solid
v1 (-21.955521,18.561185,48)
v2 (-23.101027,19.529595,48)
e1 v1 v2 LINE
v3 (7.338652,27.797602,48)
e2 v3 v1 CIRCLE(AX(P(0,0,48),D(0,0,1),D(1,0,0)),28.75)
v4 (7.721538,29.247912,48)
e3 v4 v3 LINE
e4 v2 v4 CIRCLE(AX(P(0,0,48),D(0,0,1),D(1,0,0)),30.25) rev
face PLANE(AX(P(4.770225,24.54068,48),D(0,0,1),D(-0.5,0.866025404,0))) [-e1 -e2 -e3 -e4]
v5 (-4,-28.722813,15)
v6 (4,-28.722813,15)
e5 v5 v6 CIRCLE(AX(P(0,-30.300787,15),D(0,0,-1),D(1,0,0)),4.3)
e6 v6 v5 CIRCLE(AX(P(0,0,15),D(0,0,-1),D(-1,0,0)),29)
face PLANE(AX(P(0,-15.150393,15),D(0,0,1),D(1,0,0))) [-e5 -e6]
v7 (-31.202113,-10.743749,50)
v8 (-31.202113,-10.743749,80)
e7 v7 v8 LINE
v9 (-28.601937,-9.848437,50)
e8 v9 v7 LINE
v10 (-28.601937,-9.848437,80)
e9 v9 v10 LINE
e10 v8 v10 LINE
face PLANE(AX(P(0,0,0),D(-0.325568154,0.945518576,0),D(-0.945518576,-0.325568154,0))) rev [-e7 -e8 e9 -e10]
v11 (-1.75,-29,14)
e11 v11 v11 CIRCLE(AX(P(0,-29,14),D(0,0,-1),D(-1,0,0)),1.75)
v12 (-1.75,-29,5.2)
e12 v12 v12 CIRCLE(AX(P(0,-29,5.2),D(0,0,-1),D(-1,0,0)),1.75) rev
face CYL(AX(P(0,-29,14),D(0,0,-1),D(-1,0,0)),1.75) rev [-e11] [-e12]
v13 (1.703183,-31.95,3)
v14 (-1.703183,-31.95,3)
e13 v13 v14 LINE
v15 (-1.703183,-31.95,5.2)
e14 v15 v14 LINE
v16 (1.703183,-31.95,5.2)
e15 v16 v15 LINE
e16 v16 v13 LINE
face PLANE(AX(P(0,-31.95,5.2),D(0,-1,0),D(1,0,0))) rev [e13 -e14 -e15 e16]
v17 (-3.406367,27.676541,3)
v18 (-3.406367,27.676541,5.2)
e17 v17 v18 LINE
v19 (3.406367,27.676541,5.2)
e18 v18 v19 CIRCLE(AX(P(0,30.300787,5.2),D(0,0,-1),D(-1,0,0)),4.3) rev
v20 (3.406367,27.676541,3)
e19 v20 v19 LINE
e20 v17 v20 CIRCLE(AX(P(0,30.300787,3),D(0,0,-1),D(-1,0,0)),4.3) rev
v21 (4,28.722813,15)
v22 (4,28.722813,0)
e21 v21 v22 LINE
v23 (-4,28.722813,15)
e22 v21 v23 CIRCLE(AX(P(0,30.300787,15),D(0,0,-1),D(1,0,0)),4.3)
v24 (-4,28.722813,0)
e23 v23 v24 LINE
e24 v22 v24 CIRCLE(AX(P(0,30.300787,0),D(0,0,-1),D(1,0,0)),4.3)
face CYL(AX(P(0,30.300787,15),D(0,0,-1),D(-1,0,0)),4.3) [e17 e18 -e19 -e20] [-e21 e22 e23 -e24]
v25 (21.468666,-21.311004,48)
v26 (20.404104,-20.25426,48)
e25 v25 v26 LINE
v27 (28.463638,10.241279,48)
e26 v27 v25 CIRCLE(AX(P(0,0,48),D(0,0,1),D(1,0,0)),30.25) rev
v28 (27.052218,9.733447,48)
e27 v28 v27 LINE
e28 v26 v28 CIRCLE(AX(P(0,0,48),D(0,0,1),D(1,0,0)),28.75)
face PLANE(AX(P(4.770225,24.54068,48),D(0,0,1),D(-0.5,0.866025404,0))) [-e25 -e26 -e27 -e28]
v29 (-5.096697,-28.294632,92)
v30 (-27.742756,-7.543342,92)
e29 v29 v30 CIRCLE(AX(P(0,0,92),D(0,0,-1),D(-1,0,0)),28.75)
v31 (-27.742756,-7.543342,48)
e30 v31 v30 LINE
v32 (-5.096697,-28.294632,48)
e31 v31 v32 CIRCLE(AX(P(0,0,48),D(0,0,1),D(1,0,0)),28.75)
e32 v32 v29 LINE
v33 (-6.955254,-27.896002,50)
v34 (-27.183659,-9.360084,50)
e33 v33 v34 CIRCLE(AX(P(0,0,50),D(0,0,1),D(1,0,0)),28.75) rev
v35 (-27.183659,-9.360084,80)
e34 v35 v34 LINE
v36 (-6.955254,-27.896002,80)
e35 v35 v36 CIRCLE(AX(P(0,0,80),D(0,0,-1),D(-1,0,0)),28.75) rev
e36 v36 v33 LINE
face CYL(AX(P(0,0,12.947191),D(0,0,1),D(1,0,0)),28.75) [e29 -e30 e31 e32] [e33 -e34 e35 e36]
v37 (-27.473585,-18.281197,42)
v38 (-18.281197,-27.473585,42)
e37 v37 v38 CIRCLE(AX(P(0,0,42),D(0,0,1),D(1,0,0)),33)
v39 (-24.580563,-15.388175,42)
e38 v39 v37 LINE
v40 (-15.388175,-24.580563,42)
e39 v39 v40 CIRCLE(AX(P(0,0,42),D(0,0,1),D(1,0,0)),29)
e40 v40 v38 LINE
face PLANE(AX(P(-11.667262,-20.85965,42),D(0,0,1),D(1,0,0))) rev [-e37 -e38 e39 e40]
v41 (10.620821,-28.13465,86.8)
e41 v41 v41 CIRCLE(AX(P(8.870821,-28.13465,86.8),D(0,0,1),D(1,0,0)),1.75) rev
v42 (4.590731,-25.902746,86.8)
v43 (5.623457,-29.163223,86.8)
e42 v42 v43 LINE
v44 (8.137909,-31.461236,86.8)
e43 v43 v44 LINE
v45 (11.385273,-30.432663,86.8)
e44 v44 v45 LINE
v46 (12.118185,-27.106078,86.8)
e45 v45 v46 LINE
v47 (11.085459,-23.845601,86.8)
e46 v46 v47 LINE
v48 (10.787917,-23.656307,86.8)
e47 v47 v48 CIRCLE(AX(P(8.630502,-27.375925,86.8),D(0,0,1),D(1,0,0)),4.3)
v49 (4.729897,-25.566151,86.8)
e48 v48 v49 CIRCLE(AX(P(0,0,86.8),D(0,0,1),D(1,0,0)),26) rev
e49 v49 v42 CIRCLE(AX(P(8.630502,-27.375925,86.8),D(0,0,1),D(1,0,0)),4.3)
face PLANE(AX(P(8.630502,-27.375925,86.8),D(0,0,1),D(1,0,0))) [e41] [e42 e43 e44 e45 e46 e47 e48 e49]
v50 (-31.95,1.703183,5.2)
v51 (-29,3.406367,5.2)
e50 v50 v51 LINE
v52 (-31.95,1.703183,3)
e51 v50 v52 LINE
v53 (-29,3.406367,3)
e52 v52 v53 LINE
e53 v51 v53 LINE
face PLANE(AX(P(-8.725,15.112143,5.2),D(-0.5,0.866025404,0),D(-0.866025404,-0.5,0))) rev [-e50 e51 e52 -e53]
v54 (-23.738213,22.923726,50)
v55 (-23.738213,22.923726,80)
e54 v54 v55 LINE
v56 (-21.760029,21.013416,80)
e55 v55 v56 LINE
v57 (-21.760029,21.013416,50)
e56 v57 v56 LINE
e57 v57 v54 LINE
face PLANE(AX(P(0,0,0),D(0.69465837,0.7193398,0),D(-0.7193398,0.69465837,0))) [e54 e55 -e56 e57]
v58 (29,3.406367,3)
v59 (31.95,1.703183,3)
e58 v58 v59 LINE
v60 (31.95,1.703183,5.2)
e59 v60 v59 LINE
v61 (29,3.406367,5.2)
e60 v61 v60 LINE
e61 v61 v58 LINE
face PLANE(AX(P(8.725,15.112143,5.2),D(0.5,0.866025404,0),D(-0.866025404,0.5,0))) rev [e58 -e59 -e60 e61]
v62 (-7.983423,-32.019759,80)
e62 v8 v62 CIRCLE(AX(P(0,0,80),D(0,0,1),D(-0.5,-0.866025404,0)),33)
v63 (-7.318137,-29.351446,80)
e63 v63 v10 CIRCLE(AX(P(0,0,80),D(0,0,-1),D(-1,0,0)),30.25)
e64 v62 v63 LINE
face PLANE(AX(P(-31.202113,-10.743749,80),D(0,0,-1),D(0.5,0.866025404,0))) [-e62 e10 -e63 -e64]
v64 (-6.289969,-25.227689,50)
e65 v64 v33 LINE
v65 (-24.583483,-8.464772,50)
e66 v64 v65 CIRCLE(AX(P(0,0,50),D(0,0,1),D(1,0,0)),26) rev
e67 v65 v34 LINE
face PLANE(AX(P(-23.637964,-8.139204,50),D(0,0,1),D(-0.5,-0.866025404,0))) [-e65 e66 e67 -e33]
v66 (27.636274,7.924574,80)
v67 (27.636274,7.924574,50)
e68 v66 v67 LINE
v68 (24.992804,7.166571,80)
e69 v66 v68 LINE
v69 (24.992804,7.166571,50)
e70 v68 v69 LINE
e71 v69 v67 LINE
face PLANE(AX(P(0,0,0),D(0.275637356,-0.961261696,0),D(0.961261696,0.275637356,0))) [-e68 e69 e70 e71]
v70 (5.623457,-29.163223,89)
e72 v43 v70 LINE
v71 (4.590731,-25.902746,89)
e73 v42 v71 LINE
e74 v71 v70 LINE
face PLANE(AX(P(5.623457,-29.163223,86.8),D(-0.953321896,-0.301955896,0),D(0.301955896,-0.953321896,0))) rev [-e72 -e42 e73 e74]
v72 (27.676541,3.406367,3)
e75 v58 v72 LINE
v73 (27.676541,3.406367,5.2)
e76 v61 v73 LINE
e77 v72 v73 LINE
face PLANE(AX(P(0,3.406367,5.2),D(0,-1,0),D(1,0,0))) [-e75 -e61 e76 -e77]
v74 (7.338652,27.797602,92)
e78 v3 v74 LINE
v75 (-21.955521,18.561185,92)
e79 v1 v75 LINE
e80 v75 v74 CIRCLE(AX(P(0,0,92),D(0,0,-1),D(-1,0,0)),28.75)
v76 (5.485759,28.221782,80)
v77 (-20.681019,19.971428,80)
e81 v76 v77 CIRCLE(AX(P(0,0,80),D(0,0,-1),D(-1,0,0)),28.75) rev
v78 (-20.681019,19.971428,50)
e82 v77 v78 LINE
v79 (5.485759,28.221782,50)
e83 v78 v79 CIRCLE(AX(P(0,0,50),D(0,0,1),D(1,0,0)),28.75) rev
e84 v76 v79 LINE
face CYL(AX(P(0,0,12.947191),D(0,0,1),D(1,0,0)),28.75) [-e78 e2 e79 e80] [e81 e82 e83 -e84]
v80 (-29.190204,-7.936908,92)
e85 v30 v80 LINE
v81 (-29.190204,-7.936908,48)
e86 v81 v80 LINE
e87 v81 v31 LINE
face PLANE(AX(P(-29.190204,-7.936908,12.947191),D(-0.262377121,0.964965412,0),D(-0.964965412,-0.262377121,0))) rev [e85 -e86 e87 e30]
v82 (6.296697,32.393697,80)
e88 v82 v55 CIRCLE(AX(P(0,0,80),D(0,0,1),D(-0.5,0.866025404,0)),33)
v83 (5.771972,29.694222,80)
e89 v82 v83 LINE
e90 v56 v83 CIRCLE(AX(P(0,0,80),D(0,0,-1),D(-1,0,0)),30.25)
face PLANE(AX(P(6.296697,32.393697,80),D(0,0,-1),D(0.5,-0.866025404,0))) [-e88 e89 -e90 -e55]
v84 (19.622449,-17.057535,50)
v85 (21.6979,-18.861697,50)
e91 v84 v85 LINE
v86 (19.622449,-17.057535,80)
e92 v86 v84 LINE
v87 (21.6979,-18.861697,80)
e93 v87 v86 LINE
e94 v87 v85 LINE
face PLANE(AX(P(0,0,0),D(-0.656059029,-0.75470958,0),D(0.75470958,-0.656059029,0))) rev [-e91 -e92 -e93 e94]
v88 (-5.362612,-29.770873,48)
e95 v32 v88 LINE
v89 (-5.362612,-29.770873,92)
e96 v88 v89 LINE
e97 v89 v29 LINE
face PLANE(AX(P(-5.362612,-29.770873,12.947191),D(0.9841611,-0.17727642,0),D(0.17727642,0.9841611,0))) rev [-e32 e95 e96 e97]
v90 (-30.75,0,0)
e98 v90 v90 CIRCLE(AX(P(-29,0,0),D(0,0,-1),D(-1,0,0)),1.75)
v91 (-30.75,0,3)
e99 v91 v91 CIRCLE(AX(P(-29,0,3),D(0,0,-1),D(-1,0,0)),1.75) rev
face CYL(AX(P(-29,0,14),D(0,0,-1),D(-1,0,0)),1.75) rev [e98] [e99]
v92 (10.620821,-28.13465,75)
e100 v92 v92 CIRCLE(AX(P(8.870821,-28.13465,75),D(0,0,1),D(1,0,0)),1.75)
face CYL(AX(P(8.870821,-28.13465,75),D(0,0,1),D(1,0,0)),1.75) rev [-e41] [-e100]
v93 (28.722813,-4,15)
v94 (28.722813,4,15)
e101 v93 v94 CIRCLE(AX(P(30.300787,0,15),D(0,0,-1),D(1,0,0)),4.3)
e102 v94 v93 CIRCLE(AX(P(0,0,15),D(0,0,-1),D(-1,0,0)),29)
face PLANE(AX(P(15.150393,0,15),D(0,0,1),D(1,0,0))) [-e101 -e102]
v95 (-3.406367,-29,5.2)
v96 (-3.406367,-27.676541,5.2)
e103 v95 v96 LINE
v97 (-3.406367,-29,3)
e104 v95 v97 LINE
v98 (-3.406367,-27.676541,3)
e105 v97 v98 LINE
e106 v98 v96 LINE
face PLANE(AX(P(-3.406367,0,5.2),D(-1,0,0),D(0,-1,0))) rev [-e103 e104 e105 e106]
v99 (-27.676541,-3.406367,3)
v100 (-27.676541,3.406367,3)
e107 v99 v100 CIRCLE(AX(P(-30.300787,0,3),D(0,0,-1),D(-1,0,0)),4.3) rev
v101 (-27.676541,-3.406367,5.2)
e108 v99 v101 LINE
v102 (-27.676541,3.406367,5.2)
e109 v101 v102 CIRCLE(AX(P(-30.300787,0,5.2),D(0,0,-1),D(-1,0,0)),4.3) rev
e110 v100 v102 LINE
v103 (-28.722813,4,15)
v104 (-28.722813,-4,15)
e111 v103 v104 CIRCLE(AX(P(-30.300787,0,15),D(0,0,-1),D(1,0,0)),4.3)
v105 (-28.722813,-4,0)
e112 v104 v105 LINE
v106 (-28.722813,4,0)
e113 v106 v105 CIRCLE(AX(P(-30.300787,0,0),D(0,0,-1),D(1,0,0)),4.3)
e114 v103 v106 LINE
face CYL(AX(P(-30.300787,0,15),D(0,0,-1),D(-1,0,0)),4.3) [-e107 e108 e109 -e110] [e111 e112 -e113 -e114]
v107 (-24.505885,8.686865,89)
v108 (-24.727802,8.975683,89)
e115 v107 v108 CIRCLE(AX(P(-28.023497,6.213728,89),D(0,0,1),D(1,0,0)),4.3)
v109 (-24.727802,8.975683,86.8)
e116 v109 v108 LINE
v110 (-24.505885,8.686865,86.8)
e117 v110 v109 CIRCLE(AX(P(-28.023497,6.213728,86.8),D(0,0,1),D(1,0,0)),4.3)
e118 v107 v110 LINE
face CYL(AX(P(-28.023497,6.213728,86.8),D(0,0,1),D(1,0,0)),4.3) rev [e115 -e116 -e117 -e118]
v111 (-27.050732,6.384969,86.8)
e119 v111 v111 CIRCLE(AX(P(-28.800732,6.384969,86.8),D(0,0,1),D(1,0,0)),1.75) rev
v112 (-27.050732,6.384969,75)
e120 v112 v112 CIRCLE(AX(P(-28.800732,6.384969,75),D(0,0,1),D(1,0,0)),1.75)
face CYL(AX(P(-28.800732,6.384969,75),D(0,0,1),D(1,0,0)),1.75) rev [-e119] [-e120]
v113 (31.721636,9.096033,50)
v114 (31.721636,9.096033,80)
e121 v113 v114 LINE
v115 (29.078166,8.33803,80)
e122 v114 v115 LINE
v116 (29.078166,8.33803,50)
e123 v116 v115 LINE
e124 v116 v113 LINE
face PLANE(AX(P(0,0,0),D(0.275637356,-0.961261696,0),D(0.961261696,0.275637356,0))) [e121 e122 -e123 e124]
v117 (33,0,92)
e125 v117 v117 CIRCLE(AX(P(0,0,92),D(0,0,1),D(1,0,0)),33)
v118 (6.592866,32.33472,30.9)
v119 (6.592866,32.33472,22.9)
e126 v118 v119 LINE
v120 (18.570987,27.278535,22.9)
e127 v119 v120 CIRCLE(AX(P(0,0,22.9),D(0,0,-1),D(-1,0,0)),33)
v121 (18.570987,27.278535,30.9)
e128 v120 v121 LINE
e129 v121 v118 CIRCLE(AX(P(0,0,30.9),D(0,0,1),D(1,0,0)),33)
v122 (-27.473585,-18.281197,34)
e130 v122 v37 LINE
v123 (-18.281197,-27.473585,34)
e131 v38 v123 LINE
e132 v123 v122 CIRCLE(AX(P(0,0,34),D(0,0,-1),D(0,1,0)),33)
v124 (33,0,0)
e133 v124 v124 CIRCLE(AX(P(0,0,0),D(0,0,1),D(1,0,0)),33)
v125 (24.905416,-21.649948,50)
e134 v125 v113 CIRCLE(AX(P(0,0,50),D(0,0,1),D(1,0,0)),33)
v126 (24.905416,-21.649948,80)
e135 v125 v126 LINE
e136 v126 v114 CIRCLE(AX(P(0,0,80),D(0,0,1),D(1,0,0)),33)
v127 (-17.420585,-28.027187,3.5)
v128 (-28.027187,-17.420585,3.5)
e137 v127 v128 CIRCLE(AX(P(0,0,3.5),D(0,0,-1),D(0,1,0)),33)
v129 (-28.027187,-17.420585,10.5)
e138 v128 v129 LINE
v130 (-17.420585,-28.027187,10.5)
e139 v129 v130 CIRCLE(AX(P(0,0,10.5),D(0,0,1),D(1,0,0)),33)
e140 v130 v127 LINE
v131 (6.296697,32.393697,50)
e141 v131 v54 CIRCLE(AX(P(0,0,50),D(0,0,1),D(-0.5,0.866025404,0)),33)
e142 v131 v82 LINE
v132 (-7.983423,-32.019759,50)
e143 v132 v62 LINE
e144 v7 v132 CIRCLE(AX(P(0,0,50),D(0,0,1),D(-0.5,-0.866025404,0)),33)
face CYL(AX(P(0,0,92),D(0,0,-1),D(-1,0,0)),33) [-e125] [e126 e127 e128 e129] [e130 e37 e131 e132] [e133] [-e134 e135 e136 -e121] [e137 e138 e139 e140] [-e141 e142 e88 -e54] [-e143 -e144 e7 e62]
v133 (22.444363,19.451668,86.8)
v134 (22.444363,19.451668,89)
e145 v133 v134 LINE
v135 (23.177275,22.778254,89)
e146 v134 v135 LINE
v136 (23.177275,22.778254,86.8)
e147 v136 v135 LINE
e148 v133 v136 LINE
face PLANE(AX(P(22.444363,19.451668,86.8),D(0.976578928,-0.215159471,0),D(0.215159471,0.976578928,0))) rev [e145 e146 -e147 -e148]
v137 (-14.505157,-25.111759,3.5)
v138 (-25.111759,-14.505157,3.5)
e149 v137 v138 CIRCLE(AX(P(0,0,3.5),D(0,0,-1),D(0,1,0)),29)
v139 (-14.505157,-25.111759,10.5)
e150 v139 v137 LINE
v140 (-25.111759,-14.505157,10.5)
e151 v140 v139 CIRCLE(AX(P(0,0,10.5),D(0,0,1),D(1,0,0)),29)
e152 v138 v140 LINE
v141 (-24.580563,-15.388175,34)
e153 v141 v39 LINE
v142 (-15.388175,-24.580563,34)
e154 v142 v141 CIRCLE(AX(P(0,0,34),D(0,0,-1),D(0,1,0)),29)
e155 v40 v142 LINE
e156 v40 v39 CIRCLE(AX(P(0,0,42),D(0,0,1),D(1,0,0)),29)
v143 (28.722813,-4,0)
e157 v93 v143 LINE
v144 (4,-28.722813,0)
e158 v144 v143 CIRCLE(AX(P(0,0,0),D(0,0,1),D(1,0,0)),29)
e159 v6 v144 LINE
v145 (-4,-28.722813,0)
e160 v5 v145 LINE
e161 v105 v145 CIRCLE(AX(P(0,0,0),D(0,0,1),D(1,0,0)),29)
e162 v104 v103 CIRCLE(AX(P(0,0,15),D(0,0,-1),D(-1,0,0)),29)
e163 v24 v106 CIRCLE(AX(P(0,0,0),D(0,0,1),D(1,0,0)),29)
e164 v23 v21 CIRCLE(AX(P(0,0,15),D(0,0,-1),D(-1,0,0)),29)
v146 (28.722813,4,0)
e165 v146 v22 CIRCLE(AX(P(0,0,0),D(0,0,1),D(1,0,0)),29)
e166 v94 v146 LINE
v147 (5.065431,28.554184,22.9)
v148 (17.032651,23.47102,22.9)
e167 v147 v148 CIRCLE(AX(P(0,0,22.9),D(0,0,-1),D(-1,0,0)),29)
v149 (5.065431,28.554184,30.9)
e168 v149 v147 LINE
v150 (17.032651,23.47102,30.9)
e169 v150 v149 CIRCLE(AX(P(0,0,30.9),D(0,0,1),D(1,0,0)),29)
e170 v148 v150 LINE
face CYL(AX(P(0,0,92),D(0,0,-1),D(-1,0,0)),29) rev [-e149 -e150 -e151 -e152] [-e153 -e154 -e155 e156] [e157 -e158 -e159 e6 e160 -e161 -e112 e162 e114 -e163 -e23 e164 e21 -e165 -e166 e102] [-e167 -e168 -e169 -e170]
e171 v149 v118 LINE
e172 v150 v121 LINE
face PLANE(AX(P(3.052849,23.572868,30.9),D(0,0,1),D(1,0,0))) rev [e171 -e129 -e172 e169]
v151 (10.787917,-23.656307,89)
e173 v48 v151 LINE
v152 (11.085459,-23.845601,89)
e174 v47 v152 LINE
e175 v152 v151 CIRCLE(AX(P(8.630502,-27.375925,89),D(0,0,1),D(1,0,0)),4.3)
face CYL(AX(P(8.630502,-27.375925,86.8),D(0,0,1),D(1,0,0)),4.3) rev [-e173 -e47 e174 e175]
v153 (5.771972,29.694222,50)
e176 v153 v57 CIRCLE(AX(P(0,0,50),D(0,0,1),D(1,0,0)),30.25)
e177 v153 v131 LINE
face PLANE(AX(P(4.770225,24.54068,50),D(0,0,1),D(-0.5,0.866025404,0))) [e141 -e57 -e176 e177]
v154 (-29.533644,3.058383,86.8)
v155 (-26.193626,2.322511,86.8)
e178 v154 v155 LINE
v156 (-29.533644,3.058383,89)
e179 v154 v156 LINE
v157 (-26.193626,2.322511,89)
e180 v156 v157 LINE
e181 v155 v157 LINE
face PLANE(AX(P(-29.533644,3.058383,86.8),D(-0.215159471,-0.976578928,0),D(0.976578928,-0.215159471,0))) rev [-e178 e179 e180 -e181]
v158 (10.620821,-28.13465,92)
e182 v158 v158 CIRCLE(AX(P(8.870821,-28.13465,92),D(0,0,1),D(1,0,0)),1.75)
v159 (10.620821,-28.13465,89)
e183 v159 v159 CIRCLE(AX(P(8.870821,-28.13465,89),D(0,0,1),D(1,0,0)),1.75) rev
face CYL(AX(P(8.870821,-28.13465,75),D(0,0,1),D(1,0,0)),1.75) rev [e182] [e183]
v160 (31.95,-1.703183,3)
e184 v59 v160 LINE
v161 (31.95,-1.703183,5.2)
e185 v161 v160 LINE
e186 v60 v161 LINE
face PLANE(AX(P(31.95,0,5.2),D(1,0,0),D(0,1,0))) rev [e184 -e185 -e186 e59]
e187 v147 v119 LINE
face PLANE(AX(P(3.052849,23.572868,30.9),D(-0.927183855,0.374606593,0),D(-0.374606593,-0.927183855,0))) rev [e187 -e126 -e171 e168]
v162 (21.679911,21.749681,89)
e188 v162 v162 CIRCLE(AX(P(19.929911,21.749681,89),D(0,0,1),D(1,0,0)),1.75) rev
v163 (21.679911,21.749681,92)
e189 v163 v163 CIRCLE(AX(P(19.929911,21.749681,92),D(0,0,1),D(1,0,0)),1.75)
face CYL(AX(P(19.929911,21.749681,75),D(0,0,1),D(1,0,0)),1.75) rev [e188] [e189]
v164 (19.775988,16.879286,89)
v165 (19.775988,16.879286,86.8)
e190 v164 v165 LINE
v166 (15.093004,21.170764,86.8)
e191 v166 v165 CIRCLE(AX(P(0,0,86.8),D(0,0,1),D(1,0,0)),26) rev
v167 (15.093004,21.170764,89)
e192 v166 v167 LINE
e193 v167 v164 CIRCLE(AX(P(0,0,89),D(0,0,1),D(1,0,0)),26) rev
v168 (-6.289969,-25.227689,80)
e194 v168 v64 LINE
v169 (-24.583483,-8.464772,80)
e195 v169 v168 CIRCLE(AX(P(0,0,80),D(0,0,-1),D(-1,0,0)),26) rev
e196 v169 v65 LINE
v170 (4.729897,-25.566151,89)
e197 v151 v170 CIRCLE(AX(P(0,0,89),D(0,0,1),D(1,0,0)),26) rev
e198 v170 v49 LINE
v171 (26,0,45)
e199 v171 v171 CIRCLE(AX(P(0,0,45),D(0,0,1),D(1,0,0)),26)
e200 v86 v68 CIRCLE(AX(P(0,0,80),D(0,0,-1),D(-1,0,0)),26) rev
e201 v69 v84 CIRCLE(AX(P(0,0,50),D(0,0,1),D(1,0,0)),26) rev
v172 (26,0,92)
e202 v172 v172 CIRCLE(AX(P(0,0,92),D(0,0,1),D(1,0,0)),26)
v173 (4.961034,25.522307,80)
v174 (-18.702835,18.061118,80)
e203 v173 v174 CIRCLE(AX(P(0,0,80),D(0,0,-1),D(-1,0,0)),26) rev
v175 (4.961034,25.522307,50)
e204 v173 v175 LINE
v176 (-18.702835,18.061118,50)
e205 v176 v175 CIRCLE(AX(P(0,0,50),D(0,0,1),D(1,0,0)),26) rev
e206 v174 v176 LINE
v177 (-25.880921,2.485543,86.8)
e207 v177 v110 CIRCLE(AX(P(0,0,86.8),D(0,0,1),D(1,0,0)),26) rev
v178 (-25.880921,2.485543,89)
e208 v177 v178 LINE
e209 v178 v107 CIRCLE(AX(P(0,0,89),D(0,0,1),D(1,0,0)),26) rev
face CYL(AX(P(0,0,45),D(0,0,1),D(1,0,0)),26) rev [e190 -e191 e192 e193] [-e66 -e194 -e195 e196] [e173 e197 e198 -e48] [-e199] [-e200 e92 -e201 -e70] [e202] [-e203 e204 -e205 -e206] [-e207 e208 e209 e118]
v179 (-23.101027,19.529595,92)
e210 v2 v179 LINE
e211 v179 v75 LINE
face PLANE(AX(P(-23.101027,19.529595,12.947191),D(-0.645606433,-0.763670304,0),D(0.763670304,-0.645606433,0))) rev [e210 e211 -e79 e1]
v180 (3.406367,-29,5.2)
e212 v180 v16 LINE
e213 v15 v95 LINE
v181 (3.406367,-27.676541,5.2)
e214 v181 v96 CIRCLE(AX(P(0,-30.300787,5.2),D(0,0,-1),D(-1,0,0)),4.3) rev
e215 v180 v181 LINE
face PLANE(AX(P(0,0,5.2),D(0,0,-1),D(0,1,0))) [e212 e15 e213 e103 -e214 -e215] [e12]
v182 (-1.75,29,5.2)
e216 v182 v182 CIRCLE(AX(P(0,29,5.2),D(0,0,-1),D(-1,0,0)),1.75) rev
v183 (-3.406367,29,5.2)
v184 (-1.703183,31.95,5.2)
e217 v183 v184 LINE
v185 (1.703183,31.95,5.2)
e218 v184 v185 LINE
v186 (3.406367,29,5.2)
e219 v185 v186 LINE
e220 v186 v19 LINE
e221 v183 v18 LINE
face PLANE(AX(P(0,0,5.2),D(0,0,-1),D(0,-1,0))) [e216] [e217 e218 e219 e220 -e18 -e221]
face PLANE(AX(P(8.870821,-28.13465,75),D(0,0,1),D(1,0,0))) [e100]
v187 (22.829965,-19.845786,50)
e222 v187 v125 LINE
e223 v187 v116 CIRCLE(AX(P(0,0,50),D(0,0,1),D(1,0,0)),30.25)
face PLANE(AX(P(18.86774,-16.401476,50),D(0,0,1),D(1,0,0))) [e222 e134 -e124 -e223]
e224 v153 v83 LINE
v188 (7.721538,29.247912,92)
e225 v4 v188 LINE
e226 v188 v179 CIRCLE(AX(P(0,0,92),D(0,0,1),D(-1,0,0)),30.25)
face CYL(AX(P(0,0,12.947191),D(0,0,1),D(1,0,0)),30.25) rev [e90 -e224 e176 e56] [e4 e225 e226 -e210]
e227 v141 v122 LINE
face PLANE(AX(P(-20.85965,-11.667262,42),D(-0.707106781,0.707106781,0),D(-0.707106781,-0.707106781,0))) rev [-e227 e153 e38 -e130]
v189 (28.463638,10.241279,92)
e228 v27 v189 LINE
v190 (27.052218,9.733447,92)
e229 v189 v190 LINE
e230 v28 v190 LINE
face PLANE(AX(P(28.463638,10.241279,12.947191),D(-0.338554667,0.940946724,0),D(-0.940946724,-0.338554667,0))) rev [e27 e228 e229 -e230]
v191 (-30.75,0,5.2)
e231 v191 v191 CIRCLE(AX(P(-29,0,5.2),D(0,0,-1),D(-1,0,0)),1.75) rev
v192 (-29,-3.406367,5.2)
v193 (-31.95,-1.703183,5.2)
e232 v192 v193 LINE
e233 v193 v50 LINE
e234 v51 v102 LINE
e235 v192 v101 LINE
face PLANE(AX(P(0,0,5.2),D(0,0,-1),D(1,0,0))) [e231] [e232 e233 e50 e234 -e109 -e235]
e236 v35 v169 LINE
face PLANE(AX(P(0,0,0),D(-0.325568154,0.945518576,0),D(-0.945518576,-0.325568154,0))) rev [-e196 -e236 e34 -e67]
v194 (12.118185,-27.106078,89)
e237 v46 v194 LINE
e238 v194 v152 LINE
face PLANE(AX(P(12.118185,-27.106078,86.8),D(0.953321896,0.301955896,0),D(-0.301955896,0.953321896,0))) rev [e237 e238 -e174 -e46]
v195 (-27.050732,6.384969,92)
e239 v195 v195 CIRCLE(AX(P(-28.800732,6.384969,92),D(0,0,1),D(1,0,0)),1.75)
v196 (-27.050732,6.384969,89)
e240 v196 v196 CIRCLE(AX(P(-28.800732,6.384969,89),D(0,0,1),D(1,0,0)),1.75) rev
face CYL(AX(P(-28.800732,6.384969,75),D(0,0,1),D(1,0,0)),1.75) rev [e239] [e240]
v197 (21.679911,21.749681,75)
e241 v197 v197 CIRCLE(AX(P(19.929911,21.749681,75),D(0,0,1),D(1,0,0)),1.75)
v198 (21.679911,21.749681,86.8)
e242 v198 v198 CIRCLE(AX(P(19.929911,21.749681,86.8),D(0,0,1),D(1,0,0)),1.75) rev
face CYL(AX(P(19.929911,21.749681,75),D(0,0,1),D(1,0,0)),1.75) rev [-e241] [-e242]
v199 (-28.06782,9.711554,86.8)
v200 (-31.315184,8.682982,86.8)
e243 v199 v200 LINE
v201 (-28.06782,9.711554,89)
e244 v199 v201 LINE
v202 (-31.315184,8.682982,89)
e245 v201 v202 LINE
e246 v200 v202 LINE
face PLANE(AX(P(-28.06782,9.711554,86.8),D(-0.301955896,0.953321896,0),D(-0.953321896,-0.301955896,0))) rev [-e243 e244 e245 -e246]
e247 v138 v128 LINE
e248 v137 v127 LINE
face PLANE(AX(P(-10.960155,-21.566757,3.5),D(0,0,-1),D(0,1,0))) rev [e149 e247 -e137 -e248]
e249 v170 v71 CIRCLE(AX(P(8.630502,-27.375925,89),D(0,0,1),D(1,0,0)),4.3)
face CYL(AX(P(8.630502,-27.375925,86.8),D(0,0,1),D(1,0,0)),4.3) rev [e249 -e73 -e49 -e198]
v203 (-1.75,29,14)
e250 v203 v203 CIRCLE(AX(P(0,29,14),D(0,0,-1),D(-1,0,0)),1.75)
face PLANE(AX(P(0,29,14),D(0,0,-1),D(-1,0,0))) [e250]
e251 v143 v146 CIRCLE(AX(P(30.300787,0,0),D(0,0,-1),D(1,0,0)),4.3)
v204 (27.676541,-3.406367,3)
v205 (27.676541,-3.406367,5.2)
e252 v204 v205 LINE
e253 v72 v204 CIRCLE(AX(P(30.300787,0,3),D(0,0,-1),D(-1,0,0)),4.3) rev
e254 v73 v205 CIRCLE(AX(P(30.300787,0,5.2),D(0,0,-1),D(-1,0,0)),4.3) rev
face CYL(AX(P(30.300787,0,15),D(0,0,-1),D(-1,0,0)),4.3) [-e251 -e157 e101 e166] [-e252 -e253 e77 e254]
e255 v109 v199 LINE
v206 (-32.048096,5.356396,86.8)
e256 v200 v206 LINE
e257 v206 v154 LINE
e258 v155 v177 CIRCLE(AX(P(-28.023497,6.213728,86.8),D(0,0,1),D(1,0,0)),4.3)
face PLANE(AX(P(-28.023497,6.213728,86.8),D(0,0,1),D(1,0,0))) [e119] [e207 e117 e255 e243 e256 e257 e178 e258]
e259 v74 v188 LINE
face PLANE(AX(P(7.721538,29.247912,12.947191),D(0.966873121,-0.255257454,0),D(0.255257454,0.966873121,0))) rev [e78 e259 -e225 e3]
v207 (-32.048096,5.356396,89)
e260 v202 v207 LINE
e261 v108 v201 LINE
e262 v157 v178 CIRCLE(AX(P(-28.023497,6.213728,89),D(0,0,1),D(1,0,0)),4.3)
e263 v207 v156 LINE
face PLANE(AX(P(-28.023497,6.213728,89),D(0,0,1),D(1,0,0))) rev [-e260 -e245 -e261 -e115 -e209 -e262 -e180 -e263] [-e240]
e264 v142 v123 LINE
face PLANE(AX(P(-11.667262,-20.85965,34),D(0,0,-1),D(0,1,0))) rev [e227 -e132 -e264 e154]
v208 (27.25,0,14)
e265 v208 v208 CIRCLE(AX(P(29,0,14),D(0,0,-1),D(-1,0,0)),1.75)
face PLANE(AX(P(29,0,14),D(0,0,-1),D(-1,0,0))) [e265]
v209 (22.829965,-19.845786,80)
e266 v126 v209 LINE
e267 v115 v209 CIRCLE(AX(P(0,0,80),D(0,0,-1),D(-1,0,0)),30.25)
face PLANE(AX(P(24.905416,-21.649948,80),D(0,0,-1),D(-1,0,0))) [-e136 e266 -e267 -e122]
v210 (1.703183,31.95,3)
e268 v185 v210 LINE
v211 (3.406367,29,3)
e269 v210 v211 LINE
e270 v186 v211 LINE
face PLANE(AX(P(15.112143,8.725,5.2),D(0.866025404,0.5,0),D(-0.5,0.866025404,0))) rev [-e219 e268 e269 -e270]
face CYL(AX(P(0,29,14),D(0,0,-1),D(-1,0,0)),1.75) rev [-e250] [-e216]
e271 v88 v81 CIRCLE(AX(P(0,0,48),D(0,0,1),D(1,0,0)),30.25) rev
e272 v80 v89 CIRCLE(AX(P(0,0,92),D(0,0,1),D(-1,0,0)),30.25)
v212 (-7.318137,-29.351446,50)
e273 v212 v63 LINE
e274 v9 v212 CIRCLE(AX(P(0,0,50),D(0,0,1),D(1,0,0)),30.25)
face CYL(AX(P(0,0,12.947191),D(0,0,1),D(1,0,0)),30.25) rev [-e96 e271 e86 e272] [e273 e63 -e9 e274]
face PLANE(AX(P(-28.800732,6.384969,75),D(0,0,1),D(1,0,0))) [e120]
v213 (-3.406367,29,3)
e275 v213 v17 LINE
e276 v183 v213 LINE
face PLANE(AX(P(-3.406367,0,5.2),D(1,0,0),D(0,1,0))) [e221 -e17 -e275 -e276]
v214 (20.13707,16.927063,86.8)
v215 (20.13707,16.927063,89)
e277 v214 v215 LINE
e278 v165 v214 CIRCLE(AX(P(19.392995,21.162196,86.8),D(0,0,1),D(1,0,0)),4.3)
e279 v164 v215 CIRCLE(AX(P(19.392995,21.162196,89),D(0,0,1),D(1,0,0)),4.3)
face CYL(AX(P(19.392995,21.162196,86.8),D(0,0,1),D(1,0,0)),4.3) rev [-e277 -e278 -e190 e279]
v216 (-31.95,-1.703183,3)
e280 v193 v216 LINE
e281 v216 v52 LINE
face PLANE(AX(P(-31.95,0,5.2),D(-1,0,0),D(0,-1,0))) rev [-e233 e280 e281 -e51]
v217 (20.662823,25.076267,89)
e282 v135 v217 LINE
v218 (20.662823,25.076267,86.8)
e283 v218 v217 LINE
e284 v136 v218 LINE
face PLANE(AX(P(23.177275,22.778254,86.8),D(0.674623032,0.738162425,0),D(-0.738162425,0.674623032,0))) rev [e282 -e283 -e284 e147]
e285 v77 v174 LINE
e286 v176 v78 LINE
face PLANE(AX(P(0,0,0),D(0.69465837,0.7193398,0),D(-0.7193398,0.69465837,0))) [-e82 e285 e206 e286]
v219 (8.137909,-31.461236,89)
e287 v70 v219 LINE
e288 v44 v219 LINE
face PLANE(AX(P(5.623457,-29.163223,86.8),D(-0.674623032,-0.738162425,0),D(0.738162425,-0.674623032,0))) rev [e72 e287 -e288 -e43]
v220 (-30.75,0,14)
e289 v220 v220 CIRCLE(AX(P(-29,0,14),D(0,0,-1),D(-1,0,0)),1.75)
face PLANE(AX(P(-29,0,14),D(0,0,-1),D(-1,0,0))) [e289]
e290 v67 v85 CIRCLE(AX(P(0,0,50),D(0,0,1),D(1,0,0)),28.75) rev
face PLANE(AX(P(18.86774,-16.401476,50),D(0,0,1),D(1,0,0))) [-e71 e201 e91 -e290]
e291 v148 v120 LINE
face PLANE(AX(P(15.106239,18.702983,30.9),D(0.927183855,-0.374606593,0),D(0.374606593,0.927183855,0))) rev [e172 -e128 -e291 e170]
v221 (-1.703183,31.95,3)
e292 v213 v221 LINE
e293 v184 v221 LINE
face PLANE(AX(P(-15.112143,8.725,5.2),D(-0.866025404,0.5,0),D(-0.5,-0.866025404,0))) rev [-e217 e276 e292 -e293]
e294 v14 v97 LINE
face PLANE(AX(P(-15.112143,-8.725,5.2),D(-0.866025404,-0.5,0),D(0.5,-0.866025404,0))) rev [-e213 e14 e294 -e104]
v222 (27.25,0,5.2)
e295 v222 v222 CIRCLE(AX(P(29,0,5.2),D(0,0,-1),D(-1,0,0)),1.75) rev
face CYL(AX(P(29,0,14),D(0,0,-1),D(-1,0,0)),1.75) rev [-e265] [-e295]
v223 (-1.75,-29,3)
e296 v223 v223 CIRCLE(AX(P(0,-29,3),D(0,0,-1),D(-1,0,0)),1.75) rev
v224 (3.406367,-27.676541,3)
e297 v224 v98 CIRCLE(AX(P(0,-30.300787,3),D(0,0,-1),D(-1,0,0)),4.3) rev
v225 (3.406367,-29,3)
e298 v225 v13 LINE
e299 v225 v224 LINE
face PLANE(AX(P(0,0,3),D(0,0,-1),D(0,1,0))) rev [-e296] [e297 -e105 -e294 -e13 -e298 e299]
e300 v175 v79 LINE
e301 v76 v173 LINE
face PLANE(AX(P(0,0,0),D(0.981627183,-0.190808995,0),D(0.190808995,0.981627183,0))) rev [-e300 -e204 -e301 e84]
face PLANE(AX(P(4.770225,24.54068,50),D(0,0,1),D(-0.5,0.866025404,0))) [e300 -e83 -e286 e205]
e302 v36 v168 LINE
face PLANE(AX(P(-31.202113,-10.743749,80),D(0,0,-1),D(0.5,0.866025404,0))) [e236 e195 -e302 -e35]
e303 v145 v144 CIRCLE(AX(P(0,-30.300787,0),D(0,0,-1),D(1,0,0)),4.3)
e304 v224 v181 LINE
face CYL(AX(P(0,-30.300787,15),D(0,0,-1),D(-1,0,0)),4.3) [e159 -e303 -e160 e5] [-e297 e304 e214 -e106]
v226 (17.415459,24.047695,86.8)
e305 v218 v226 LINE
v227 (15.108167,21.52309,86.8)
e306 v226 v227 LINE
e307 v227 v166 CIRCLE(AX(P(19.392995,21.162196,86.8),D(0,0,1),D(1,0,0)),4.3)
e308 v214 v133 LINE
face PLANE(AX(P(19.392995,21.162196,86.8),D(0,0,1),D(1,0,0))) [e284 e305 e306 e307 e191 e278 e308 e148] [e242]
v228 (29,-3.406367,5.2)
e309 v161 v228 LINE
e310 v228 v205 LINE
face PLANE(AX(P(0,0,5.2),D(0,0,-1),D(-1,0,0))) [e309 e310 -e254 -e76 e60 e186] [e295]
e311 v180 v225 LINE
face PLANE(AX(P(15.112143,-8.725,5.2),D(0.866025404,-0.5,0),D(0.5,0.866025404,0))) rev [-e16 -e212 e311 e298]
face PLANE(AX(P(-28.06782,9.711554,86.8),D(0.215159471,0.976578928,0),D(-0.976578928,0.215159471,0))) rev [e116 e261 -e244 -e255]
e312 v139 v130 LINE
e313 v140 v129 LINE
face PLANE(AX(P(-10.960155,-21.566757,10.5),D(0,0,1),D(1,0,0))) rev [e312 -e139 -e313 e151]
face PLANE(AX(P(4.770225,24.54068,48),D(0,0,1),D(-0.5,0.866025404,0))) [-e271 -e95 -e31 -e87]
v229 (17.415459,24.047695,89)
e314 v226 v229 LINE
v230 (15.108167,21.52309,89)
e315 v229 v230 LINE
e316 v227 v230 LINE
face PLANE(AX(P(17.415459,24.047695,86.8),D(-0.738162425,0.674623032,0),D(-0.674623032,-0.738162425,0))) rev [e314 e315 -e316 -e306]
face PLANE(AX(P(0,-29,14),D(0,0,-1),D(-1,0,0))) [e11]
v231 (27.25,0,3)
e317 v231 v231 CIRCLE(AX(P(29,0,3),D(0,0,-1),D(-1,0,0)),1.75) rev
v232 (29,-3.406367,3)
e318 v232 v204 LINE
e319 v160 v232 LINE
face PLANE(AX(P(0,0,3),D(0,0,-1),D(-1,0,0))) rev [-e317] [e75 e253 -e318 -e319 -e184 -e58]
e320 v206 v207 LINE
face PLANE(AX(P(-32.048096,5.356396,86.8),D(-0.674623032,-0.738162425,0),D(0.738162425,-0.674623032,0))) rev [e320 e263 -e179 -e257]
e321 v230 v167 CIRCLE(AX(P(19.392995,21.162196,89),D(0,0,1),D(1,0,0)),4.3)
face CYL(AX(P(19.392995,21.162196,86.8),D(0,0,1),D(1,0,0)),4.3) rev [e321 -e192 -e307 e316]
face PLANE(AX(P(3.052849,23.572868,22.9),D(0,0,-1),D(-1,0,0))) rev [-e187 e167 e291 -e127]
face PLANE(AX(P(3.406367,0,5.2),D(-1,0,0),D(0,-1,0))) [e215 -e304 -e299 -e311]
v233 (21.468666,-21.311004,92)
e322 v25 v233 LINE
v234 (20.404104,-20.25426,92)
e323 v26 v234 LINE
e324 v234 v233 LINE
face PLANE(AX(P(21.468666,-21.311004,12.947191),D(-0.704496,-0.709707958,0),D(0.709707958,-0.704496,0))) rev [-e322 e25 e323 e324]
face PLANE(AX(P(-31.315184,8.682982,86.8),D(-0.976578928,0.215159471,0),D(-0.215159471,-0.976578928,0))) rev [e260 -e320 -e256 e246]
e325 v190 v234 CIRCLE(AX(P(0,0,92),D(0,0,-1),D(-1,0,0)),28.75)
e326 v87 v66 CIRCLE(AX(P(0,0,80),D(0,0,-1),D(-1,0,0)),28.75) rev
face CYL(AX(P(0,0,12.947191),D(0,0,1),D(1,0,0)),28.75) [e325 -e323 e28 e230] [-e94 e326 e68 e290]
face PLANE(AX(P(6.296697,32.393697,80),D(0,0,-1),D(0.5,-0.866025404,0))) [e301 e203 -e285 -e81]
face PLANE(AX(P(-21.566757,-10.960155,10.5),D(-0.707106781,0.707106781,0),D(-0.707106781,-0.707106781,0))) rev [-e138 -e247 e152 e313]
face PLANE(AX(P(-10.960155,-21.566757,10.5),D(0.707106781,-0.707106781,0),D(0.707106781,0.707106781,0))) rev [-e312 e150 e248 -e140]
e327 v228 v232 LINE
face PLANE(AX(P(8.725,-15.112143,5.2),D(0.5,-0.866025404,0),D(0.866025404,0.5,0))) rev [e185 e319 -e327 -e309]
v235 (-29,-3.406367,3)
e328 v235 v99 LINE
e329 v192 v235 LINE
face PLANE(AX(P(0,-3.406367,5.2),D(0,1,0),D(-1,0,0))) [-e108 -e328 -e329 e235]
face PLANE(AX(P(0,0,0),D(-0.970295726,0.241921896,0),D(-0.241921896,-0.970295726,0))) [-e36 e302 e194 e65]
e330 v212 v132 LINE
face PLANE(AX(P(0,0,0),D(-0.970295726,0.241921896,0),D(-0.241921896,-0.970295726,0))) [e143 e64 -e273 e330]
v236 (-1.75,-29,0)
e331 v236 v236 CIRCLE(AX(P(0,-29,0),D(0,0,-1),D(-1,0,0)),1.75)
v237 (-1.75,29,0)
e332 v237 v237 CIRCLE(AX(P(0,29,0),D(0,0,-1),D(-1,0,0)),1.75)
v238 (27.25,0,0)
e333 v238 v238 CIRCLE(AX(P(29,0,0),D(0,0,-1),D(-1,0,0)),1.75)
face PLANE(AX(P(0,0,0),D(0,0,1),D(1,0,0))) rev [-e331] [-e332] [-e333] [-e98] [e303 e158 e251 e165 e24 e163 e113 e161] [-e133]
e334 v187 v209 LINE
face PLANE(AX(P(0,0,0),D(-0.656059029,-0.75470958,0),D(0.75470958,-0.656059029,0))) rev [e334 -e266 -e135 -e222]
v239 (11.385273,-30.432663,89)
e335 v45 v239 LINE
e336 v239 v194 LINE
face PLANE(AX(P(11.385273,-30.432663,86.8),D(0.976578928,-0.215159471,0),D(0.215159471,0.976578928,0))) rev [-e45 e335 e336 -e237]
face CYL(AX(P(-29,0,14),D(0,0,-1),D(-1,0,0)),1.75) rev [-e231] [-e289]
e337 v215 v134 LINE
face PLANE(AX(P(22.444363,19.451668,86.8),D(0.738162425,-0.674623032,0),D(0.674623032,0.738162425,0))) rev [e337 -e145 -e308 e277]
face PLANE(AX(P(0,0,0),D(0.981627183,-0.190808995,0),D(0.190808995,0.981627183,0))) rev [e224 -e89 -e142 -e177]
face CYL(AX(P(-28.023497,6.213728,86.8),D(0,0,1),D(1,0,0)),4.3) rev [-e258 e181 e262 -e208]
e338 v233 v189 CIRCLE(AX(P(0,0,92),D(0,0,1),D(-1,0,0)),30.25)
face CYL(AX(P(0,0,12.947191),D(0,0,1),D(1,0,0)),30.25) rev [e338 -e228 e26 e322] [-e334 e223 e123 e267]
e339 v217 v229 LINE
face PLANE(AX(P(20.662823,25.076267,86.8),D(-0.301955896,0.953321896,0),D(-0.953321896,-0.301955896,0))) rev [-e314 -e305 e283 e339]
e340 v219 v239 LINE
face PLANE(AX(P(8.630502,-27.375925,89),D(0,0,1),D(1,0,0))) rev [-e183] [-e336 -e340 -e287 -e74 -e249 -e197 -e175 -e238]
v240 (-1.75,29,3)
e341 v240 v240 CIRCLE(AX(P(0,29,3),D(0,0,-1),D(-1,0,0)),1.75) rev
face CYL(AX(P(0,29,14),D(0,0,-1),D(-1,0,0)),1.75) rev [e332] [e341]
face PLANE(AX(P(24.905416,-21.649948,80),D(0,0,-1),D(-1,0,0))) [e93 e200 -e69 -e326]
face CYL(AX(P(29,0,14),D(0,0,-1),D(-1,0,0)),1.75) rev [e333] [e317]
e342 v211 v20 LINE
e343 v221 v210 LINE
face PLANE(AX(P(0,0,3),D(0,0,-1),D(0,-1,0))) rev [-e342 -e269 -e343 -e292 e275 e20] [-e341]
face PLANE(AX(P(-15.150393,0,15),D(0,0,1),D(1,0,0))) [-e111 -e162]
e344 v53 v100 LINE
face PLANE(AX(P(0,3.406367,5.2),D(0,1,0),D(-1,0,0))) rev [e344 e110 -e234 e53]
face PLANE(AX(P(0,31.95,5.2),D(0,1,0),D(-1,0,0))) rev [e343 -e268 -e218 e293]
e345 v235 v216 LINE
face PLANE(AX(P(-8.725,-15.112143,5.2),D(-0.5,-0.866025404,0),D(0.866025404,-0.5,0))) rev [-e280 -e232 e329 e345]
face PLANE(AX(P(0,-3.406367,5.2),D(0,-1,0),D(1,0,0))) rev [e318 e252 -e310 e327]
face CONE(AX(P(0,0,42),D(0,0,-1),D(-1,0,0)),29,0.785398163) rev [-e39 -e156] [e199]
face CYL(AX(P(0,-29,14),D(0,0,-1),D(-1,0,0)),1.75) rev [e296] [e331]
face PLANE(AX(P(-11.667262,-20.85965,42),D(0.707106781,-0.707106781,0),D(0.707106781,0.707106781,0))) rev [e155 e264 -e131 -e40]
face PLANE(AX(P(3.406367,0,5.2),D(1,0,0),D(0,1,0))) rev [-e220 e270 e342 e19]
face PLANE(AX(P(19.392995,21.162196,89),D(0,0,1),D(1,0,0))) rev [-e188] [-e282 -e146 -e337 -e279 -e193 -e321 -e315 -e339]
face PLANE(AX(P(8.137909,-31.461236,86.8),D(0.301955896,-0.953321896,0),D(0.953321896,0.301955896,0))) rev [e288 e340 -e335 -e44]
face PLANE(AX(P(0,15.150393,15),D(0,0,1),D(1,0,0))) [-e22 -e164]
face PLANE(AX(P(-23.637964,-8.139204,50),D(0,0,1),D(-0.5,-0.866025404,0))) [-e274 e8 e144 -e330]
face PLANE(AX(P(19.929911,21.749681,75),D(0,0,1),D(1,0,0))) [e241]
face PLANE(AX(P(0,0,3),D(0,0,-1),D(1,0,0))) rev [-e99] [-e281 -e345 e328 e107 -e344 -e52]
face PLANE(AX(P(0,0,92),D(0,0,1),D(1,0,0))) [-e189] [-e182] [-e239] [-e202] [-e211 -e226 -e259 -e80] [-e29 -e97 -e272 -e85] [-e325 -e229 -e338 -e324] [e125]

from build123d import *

# Parameters (mm, degrees)
CROQUIS1_R                          = 33
CROQUIS1_R_2                        = 29
BOSS_EXTRUDE1_DEPTH                 = 92
BOSS_EXTRUDE4_DEPTH                 = 15
SKETCH9_R                           = 1.75
CUT_EXTRUDE3_DEPTH                  = 14
SKETCH10_W                          = 7
SKETCH10_H                          = 15
SKETCH10_W_2                        = 8
SKETCH10_H_2                        = 13
CORTE_USB_Y_SWITCH_DEPTH            = 10
SKETCH11_W                          = 8
SKETCH11_H                          = 13
CUT_EXTRUDE5_DEPTH                  = 10
ALOJAMIENTO_TUERCA_DEPTH            = 2.2
ALOJAMIENTOS_TUERCAS_SUPERIOR_COUNT = 4
GROSOR_START                        = -47
SKETCH13_R                          = 29
SKETCH13_R_2                        = 26
GROSOR_ADICIONAL_DEPTH              = 47
CORTE_REVOLUCION_W                  = 30
CORTE_REVOLUCION_H                  = 8
CUT_REVOLVE3_ANGLE                  = 57
CIRPATTERN3_COUNT                   = 3
CORTE_POSTIZOS_DEPTH                = 44
CHAMFER3_SIZE                       = 3
SKETCH14_R                          = 1.75
CUT_EXTRUDE6_DEPTH                  = 17
TUERCAS_INFERIOR_DEPTH              = 2.2


with BuildPart() as part:
    # Croquis1 → Boss-Extrude1 (new body)
    with BuildSketch(Plane.XY):
        Circle(CROQUIS1_R)
        Circle(CROQUIS1_R_2, mode=Mode.SUBTRACT)
    extrude(amount=BOSS_EXTRUDE1_DEPTH)

    # Sketch8 → Boss-Extrude4 (add)
    with BuildSketch(Plane(origin=(0, 0, 0), x_dir=(-1, 0, 0), z_dir=(0, 0, -1))):
        with BuildLine():
            ThreePointArc((-4, -28.722813233), (0, -29), (4, -28.722813233))
            ThreePointArc((4, -28.722813233), (0, -26.000786616), (-4, -28.722813233))
        make_face()
        with BuildLine():
            ThreePointArc((-28.722813233, 4), (-29, 0), (-28.722813233, -4))
            ThreePointArc((-28.722813233, -4), (-26.000786616, 0), (-28.722813233, 4))
        make_face()
        with BuildLine():
            ThreePointArc((4, 28.722813233), (0, 29), (-4, 28.722813233))
            ThreePointArc((-4, 28.722813233), (0, 26.000786616), (4, 28.722813233))
        make_face()
        with BuildLine():
            ThreePointArc((28.722813233, -4), (29, 0), (28.722813233, 4))
            ThreePointArc((28.722813233, 4), (26.000786616, 0), (28.722813233, -4))
        make_face()
    extrude(amount=-BOSS_EXTRUDE4_DEPTH)

    # Sketch9 → Cut-Extrude3 (cut)
    with BuildSketch(Plane(origin=(0, 0, 0), x_dir=(-1, 0, 0), z_dir=(0, 0, -1))):
        with Locations((0, -29)):
            Circle(SKETCH9_R)
        with Locations((-29, 0)):
            Circle(SKETCH9_R)
        with Locations((0, 29)):
            Circle(SKETCH9_R)
        with Locations((29, 0)):
            Circle(SKETCH9_R)
    extrude(amount=-CUT_EXTRUDE3_DEPTH, mode=Mode.SUBTRACT)

    # Sketch10 → Corte USB y Switch (cut)
    with BuildSketch(Plane(origin=(-23.334523779, -23.334523779, 0), x_dir=(0, 0, -1), z_dir=(-0.7071067811865488, -0.7071067811865464, 0))):
        with Locations((-7, 0)):
            Rectangle(SKETCH10_W, SKETCH10_H)
        with Locations((-38, 0)):
            Rectangle(SKETCH10_W_2, SKETCH10_H_2)
    extrude(amount=-CORTE_USB_Y_SWITCH_DEPTH, mode=Mode.SUBTRACT)

    # Sketch11 → Cut-Extrude5 (cut)
    with BuildSketch(Plane(origin=(12.362017583, 30.597067201, 0), x_dir=(0, 0, -1), z_dir=(0.37460659341590646, 0.9271838545667896, 0))):
        with Locations((-26.9, -0.5)):
            Rectangle(SKETCH11_W, SKETCH11_H)
    extrude(amount=-CUT_EXTRUDE5_DEPTH, mode=Mode.SUBTRACT)

    # Tuerca → Alojamiento tuerca (cut)
    with BuildSketch(Plane(origin=(0, 0, 3), x_dir=(-1, 0, 0), z_dir=(0, 0, -1))):
        with BuildLine():
            Line((-29, -3.406366588), (-25.579878574, -3.406366588))
            ThreePointArc((-25.579878574, -3.406366588), (-23.904124497, 0), (-25.579878574, 3.406366588))
            Line((-25.579878574, 3.406366588), (-29, 3.406366588))
            Line((-29, 3.406366588), (-31.95, 1.703183294))
            Line((-31.95, 1.703183294), (-31.95, -1.703183294))
            Line((-31.95, -1.703183294), (-29, -3.406366588))
        make_face()
    alojamiento_tuerca = extrude(amount=-ALOJAMIENTO_TUERCA_DEPTH, mode=Mode.SUBTRACT)

    # Alojamientos Tuercas Superior: Alojamiento tuerca ×4 about axis
    alojamientos_tuercas_superior_axis = Axis((0, 0, 0), (0, 0, 1))
    for i in range(1, ALOJAMIENTOS_TUERCAS_SUPERIOR_COUNT):
        add(alojamiento_tuerca.rotate(alojamientos_tuercas_superior_axis, i * 360 / ALOJAMIENTOS_TUERCAS_SUPERIOR_COUNT), mode=Mode.SUBTRACT)

    # Sketch13 → Grosor adicional (add)
    with BuildSketch(Plane.XY.offset(92).offset(GROSOR_START)):
        with Locations(Location((0, 0, 0), (0, 0, 187.928141766))):
            Circle(SKETCH13_R)
        Circle(SKETCH13_R_2, mode=Mode.SUBTRACT)
    extrude(amount=GROSOR_ADICIONAL_DEPTH)

    # Corte Revolucion → Cut-Revolve3 (revolve, cut)
    with BuildSketch(Plane(origin=(0, 0, 0), x_dir=(0, 0, -1), z_dir=(0.2756373558169964, -0.9612616959383197, 0))):
        with Locations((-65, 29)):
            Rectangle(CORTE_REVOLUCION_W, CORTE_REVOLUCION_H)
    cut_revolve3 = revolve(axis=Axis((0, 0, 92), (0, 0, -1)), revolution_arc=CUT_REVOLVE3_ANGLE, mode=Mode.SUBTRACT)

    # CirPattern3: Cut-Revolve3 ×3 about axis
    cirpattern3_axis = Axis((0, 0, 0), (0, 0, 1))
    for i in range(1, CIRPATTERN3_COUNT):
        add(cut_revolve3.rotate(cirpattern3_axis, i * 360 / CIRPATTERN3_COUNT), mode=Mode.SUBTRACT)

    # Croquis2 → Corte postizos (cut)
    with BuildSketch(Plane.XY.offset(92)):
        with BuildLine():
            Line((7.72153797, 29.247911915), (7.338651789, 27.797602233))
            ThreePointArc((7.338651789, 27.797602233), (-8.645291736, 27.419362334), (-21.955521244, 18.561184955))
            Line((-21.955521244, 18.561184955), (-23.1010267, 19.529594604))
            ThreePointArc((-23.1010267, 19.529594604), (-9.096350435, 28.84993776), (7.72153797, 29.247911915))
        make_face()
        with BuildLine():
            Line((21.468665741, -21.311003996), (20.404103804, -20.254259996))
            ThreePointArc((20.404103804, -20.254259996), (28.068510205, -6.222638901), (27.052218317, 9.733446673))
            Line((27.052218317, 9.733446673), (28.463638403, 10.241278673))
            ThreePointArc((28.463638403, 10.241278673), (29.532954215, -6.547298322), (21.468665741, -21.311003996))
        make_face()
        with BuildLine():
            Line((-29.190203711, -7.936907919), (-27.742755593, -7.543342237))
            ThreePointArc((-27.742755593, -7.543342237), (-19.423218469, -21.196723433), (-5.096697073, -28.294631628))
            Line((-5.096697073, -28.294631628), (-5.362611703, -29.770873278))
            ThreePointArc((-5.362611703, -29.770873278), (-20.43660378, -22.302639439), (-29.190203711, -7.936907919))
        make_face()
    extrude(amount=-CORTE_POSTIZOS_DEPTH, mode=Mode.SUBTRACT)

    # Chamfer3
    chamfer3_edges = [part.edges().sort_by_distance(p)[0] for p in [
        (-29, 0, 45),
    ]]
    chamfer(chamfer3_edges, length=CHAMFER3_SIZE - 0.0001)  # a hair under: the kernel refuses the full size

    # Sketch14 → Cut-Extrude6 (cut)
    with BuildSketch(Plane.XY.offset(92)):
        with Locations((19.929911125, 21.749681436)):
            Circle(SKETCH14_R)
        with Locations((8.870821085, -28.134650047)):
            Circle(SKETCH14_R)
        with Locations((-28.80073221, 6.384968611)):
            Circle(SKETCH14_R)
    extrude(amount=-CUT_EXTRUDE6_DEPTH, mode=Mode.SUBTRACT)

    # Sketch15 → Tuercas inferior (cut)
    with BuildSketch(Plane.XY.offset(89)):
        with BuildLine():
            Line((17.415459305, 24.047694791), (15.108166619, 21.523089667))
            ThreePointArc((15.108166619, 21.523089667), (16.492116143, 17.98809762), (20.137070258, 16.927062957))
            Line((20.137070258, 16.927062957), (22.444362944, 19.451668081))
            Line((22.444362944, 19.451668081), (23.177274978, 22.778253911))
            Line((23.177274978, 22.778253911), (20.662823159, 25.076267266))
            Line((20.662823159, 25.076267266), (17.415459305, 24.047694791))
        make_face()
        with BuildLine():
            Line((12.118184939, -27.106077572), (11.08545911, -23.84560093))
            ThreePointArc((11.08545911, -23.84560093), (7.332091433, -23.276640352), (4.590731403, -25.90274588))
            Line((4.590731403, -25.90274588), (5.623457232, -29.163222522))
            Line((5.623457232, -29.163222522), (8.137909051, -31.461235877))
            Line((8.137909051, -31.461235877), (11.385272905, -30.432663402))
            Line((11.385272905, -30.432663402), (12.118184939, -27.106077572))
        make_face()
        with BuildLine():
            Line((-29.533644244, 3.058382781), (-26.193625729, 2.322511264))
            ThreePointArc((-26.193625729, 2.322511264), (-23.824207576, 5.288542732), (-24.727801661, 8.975682923))
            Line((-24.727801661, 8.975682923), (-28.067820176, 9.711554441))
            Line((-28.067820176, 9.711554441), (-31.31518403, 8.682981966))
            Line((-31.31518403, 8.682981966), (-32.048096064, 5.356396136))
            Line((-32.048096064, 5.356396136), (-29.533644244, 3.058382781))
        make_face()
    extrude(amount=-TUERCAS_INFERIOR_DEPTH, mode=Mode.SUBTRACT)


solid = part.part
